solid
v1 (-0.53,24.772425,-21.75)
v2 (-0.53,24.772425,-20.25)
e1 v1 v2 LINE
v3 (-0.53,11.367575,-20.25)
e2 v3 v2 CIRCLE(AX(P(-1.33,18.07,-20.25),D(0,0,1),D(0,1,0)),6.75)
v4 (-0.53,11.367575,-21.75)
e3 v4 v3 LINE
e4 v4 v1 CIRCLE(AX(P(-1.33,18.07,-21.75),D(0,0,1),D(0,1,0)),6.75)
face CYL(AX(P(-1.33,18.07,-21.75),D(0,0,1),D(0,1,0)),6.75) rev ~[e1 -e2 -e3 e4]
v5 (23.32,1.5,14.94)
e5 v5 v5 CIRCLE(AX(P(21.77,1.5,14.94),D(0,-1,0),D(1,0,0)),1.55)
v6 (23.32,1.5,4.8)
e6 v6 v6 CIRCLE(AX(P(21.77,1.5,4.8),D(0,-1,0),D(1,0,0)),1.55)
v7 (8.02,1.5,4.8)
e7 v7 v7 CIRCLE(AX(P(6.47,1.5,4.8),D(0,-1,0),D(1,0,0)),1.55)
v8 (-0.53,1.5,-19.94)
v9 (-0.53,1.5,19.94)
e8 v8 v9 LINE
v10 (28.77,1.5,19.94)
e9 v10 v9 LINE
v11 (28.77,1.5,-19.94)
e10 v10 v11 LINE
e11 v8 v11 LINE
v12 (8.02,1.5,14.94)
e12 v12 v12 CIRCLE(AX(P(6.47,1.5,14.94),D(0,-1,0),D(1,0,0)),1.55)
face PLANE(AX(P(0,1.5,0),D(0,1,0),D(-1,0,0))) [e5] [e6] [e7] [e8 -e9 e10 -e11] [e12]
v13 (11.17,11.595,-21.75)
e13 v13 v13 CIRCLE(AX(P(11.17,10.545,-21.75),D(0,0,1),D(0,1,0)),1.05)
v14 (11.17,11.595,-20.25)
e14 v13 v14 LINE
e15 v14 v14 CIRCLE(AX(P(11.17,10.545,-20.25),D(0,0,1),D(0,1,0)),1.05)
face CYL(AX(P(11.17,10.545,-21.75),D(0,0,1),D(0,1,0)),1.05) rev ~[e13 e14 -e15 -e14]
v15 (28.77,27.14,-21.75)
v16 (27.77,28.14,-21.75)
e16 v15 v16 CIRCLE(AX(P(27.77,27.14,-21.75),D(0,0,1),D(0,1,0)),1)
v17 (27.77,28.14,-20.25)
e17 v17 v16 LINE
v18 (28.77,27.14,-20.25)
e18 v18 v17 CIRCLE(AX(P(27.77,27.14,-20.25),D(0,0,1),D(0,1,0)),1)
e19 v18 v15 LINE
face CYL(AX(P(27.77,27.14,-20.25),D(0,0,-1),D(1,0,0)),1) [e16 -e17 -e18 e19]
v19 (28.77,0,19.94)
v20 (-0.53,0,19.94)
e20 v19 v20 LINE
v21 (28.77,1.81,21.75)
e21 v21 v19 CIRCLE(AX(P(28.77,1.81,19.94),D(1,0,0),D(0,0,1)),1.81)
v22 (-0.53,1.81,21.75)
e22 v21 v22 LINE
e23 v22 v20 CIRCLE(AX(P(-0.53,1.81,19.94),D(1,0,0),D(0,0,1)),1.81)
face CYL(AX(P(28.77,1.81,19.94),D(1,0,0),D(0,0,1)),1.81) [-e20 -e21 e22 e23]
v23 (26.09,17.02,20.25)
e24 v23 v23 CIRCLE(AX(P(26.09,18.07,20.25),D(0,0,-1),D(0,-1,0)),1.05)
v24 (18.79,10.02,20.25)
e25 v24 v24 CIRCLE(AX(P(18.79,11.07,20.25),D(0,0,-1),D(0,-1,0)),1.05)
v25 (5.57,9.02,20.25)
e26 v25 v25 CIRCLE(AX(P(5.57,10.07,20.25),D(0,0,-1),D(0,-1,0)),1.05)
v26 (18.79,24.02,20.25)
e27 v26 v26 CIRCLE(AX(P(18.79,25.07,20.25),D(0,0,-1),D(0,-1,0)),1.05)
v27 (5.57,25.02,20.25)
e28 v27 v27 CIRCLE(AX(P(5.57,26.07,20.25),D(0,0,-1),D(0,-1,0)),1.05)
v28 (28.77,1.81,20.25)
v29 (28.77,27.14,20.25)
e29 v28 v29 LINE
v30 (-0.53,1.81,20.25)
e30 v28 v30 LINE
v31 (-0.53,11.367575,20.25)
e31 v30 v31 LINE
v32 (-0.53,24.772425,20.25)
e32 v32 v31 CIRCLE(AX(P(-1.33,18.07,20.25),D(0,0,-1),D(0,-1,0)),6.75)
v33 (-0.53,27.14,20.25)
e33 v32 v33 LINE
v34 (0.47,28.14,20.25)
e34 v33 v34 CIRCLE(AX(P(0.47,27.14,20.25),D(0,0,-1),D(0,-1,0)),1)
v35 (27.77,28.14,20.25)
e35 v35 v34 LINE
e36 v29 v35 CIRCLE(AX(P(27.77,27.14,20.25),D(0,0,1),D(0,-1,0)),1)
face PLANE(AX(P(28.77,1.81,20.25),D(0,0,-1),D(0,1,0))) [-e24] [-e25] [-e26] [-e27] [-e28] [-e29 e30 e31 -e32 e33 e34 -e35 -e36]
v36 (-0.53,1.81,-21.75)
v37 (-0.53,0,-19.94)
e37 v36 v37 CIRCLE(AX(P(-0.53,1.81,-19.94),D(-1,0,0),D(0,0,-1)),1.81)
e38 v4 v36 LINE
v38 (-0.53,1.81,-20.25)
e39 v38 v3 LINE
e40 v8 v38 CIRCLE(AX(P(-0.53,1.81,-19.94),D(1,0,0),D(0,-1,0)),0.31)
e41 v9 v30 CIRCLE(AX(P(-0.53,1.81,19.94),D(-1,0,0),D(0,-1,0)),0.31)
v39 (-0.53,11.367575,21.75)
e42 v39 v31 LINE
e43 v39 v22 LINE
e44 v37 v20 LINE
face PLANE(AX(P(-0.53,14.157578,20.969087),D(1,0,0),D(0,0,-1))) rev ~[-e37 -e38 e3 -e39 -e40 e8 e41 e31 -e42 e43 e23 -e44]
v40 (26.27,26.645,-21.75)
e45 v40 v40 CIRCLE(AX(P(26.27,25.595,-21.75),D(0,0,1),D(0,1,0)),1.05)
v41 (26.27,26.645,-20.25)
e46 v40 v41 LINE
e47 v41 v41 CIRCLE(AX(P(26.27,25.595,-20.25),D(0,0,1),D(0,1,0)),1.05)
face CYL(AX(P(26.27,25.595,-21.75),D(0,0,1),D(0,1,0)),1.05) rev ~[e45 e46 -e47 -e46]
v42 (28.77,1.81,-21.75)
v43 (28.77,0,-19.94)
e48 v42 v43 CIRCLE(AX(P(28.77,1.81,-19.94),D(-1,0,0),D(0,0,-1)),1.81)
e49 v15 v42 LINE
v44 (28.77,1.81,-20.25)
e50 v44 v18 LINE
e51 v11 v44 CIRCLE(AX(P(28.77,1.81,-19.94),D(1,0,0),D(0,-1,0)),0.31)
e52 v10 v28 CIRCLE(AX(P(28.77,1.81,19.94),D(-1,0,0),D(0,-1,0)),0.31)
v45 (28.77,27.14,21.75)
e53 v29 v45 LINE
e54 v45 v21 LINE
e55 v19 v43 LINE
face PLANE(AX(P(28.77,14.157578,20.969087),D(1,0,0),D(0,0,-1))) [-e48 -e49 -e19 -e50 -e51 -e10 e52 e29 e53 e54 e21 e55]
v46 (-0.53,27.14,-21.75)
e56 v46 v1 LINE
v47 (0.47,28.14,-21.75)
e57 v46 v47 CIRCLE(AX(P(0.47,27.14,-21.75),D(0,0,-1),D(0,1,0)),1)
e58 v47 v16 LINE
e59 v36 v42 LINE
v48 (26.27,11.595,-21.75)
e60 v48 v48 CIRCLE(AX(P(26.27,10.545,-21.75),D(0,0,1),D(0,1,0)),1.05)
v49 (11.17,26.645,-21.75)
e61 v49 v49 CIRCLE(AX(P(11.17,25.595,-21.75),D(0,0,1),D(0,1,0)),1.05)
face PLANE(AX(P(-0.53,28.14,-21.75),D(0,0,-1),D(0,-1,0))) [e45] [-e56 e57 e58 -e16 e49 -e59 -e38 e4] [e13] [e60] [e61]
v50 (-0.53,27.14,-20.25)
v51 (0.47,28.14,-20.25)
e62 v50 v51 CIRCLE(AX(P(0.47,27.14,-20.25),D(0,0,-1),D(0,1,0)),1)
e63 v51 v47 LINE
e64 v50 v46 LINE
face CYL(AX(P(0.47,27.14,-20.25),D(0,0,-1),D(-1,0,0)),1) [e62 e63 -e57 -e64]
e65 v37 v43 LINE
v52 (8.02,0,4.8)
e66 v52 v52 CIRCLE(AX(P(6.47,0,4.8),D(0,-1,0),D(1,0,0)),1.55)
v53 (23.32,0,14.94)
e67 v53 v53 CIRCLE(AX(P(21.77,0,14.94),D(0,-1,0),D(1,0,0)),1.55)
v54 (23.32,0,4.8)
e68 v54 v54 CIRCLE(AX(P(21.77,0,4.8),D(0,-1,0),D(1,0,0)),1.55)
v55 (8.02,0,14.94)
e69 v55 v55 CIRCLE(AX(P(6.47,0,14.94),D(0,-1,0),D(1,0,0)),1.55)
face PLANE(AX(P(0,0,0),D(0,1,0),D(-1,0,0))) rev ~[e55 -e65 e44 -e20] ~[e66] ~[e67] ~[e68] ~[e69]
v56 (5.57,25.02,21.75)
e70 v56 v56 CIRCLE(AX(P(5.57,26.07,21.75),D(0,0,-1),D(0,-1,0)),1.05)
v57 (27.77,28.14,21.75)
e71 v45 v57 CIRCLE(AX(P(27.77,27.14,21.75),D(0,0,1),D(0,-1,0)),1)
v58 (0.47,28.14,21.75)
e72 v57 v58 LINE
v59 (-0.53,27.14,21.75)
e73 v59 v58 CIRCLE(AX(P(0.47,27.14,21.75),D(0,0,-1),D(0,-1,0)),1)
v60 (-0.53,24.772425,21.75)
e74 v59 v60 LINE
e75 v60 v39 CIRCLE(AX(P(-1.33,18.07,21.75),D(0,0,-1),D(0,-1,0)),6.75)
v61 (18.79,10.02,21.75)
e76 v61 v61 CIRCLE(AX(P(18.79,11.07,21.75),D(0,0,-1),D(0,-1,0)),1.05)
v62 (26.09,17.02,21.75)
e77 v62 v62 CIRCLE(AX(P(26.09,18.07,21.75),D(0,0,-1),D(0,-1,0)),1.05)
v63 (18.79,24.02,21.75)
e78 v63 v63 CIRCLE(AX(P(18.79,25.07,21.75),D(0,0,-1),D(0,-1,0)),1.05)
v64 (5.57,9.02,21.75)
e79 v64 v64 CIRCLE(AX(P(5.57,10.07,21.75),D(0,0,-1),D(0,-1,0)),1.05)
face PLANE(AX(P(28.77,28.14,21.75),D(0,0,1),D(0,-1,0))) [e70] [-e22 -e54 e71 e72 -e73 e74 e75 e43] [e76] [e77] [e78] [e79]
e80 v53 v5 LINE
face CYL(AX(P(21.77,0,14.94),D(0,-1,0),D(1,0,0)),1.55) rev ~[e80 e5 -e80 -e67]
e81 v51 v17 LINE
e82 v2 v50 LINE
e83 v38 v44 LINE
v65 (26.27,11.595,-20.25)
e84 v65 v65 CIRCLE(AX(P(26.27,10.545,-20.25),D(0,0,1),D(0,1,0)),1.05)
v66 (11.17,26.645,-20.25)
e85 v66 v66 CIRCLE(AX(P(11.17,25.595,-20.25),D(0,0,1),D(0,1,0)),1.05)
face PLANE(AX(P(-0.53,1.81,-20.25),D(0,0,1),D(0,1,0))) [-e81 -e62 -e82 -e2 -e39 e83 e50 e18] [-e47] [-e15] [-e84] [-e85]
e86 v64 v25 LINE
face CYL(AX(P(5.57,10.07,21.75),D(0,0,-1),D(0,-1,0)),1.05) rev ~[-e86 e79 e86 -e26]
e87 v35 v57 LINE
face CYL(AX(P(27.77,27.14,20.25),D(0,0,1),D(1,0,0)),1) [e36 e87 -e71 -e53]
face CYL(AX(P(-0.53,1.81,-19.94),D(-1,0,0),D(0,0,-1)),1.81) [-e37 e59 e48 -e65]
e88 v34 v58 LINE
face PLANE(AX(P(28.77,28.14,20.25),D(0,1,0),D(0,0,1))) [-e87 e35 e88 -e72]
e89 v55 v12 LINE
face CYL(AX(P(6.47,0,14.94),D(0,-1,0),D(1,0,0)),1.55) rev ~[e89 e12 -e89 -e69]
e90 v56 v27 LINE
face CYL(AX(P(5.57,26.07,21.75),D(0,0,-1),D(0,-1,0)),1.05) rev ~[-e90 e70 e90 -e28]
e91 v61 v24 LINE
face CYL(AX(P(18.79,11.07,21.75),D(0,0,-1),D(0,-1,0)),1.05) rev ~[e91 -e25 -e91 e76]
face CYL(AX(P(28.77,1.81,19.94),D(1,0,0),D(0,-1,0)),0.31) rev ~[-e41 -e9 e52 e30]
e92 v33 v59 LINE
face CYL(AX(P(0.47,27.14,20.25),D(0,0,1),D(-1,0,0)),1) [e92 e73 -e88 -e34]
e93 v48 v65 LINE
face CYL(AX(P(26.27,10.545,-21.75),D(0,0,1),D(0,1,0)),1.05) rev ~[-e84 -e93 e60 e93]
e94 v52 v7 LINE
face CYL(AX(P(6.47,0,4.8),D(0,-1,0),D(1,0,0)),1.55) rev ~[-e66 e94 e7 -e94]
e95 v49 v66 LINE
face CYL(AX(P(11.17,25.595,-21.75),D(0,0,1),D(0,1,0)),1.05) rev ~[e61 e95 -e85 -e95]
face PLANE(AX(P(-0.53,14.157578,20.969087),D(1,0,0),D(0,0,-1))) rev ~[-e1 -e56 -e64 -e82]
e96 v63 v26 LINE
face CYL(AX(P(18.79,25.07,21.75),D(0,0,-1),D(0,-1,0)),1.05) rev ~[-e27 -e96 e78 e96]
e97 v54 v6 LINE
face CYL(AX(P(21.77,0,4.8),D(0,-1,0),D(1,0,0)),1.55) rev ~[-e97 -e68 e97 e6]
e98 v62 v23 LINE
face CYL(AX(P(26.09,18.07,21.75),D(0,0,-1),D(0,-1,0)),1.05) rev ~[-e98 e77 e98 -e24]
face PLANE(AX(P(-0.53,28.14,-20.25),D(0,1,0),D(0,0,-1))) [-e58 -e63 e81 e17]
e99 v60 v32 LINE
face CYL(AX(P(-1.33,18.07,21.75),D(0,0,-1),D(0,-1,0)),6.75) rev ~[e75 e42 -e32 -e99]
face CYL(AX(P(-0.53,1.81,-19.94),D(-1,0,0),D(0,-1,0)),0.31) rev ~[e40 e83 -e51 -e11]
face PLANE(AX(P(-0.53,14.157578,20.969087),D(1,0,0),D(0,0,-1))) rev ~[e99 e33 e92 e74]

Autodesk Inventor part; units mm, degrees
ref_plane "YZ Plane" through (0, 0, 0) normal (1, 0, 0) x (0, 1, 0)
ref_plane "XZ Plane" through (0, 0, 0) normal (0, 1, 0) x (-1, 0, 0)
ref_plane "XY Plane" through (0, 0, 0) normal (0, 0, 1) x (1, 0, 0)
sketch "Sketch1" plane through (0, 0, 0) normal (0, 1, 0) x (-1, 0, 0)
  line L0 (0.53, 20.25) -> (-28.77, 20.25)
  line L1 (-28.77, 20.25) -> (-28.77, -20.25)
  line L2 (-28.77, -20.25) -> (0.53, -20.25)
  line L3 (0.53, -20.25) -> (0.53, 20.25)
  point P0 (0, 0)
  dimension "d0" = 40.5
  dimension "d1" = 29.3
  dimension "d2" = -0.53
  dimension "d3" = 20.25
extrude "Plate1" add sketch "Sketch1" along normal blind 1.5
sketch "Sketch2" plane through (28.77, 0, 21.75) normal (0, 0, -1) x (-1, 0, 0)
  line L0 (29.3, 0) -> (0, 0)
  line L1 (0, 0) -> (0, 28.14)
  line L2 (0, 28.14) -> (29.3, 28.14)
  line L3 (29.3, 28.14) -> (29.3, 0)
edge flange "Flange1" height 28.14 angle 90 thickness 1.5 bend radius 0.31 thickness toward (0, 0, -1) relief tear relief width 1.5 relief depth 0.75 corner gap 0.31 corner form 0 edges at (14.12, 1.5, 20.25) (14.12, 1.5, -20.25) wall of the first edge with corners at (-0.53, 0, 21.75) (28.77, 0, 21.75) (28.77, 28.14, 21.75) (-0.53, 28.14, 21.75)
bend "Bend1"
corner "Corner1"
sketch "Sketch6" plane through (-0.53, 28.14, 21.75) normal (0, 0, 1) x (1, 0, 0)
  point P0 (0.53, -28.14)
sketch "Sketch8" plane through (28.77, 28.14, -21.75) normal (0, 0, -1) x (-1, 0, 0)
  circle A0 centre (2.5, -2.545) radius 0.7835
  circle A1 centre (2.5, -17.595) radius 0.7835
  circle A2 centre (17.6, -2.545) radius 0.7835
  circle A3 centre (17.6, -17.595) radius 0.7835
  circle A4 centre (37.6, -2.545) radius 0.7835
  circle A5 centre (37.6, -17.595) radius 0.7835
  point P0 (28.77, -28.14)
hole "Hole4" at (26.27, 25.595, -21.75) at (26.27, 10.545, -21.75) at (11.17, 25.595, -21.75) at (11.17, 10.545, -21.75) at (-8.83, 25.595, -21.75) at (-8.83, 10.545, -21.75) direction (0, 0, 1) diameter 2.1 depth 1.5
sketch "Sketch9" plane through (28.77, 28.14, -21.75) normal (0, 0, -1) x (-1, 0, 0)
  circle A0 centre (30.1, -10.07) radius 6
  point P0 (28.77, -28.14)
sketch "Sketch10" plane through (-0.53, 28.14, 21.75) normal (0, 0, 1) x (1, 0, 0)
  point P0 (0.53, -28.14)
sketch "Sketch11" plane through (-0.53, 28.14, 21.75) normal (0, 0, 1) x (1, 0, 0)
  point P0 (0.53, -28.14)
sketch "Sketch15" plane through (0, 0, 0) normal (0, -1, 0) x (1, 0, 0)
  point P0 (0, 0)
sketch "Sketch16" plane through (0, 0, 0) normal (0, -1, 0) x (1, 0, 0)
  circle A0 centre (6.47, 14.94) radius 1.55
  line L0 (28.77, 19.94) -> (-0.53, 19.94) projected
  line L1 (-0.53, -19.94) -> (-0.53, 19.94) projected
  circle A1 centre (21.77, 14.94) radius 1.55
  line L2 (28.77, 19.94) -> (28.77, -19.94) projected
  circle A2 centre (6.47, 4.8) radius 1.55
  circle A3 centre (21.77, 4.8) radius 1.55
  point P0 (0, 0)
  dimension "d65" = 3.1
  dimension "d66" = 5
  dimension "d67" = 7
  dimension "d68" = 3.1
  dimension "d69" = 5
  dimension "d70" = 7
  dimension "d71" = 3.1
  dimension "d72" = 15.14
  dimension "d73" = 7
  dimension "d74" = 3.1
  dimension "d75" = 15.14
  dimension "d76" = 7
extrude "Cut6" cut sketch "Sketch16" against normal blind 1.5
sketch "Sketch18" plane through (-0.53, 28.14, 21.75) normal (0, 0, 1) x (1, 0, 0)
  circle A0 centre (-0.8, -10.07) radius 6
  point P0 (0.53, -28.14)
fillet "Corner Round1" radius 1 4 edges at (-0.53, 28.14, -21) (28.77, 28.14, -21) (28.77, 28.14, 21) (-0.53, 28.14, 21)
sketch "Sketch19" plane through (-0.53, 1.81, 21.75) normal (0, 0, 1) x (1, 0, 0)
  circle A0 centre (6.1, 24.26) radius 0.7835
  circle A1 centre (19.32, 23.26) radius 0.7835
  circle A2 centre (26.62, 16.26) radius 0.7835
  circle A3 centre (19.32, 9.26) radius 0.7835
  circle A4 centre (6.1, 8.26) radius 0.7835
  point P0 (0.53, -1.81)
hole "Hole6" at (5.57, 26.07, 21.75) at (18.79, 25.07, 21.75) at (26.09, 18.07, 21.75) at (18.79, 11.07, 21.75) at (5.57, 10.07, 21.75) direction (0, 0, -1) diameter 2.1 depth 1.5
hole "Hole7" at (-1.33, 18.07, 21.75) direction (0, 0, -1) diameter 13.5 depth 1.5
hole "Hole8" at (-1.33, 18.07, -21.75) direction (0, 0, 1) diameter 13.5 depth 1.5
equation "\"d55\" = Thickness"
equation "\"d77\" = Thickness"
equation "\"d94\" = Thickness"
equation "\"d101\" = Thickness"
equation "\"d108\" = Thickness"
equation "\"d4\" = Thickness"
equation "\"d5\" = BendReliefWidth"
equation "\"d6\" = BendReliefDepth"
equation "\"d7\" = MinimumRemnant"
equation "\"d8\" = TransitionRadius"
equation "\"d11\" = BendRadius"
equation "\"d12\" = CornerReliefSize"
equation "\"d13\" = GapSize"
equation "\"d14\" = JacobiRadiusSize"
equation "\"BendReliefWidth\" = Thickness"
equation "\"BendReliefDepth\" = 0.5 * Thickness"
equation "\"CornerReliefSize\" = 4 * Thickness"
equation "\"MinimumRemnant\" = 2 * Thickness"
equation "\"TransitionRadius\" = BendRadius"
equation "\"JacobiRadiusSize\" = BendRadius"
equation "\"GapSize\" = Thickness"
equation "\"Thickness\" = 1.5"
equation "\"BendRadius\" = 0.31"
properties part number "axis_25_bottom_frame" material "Aluminum 6061-AHC"
